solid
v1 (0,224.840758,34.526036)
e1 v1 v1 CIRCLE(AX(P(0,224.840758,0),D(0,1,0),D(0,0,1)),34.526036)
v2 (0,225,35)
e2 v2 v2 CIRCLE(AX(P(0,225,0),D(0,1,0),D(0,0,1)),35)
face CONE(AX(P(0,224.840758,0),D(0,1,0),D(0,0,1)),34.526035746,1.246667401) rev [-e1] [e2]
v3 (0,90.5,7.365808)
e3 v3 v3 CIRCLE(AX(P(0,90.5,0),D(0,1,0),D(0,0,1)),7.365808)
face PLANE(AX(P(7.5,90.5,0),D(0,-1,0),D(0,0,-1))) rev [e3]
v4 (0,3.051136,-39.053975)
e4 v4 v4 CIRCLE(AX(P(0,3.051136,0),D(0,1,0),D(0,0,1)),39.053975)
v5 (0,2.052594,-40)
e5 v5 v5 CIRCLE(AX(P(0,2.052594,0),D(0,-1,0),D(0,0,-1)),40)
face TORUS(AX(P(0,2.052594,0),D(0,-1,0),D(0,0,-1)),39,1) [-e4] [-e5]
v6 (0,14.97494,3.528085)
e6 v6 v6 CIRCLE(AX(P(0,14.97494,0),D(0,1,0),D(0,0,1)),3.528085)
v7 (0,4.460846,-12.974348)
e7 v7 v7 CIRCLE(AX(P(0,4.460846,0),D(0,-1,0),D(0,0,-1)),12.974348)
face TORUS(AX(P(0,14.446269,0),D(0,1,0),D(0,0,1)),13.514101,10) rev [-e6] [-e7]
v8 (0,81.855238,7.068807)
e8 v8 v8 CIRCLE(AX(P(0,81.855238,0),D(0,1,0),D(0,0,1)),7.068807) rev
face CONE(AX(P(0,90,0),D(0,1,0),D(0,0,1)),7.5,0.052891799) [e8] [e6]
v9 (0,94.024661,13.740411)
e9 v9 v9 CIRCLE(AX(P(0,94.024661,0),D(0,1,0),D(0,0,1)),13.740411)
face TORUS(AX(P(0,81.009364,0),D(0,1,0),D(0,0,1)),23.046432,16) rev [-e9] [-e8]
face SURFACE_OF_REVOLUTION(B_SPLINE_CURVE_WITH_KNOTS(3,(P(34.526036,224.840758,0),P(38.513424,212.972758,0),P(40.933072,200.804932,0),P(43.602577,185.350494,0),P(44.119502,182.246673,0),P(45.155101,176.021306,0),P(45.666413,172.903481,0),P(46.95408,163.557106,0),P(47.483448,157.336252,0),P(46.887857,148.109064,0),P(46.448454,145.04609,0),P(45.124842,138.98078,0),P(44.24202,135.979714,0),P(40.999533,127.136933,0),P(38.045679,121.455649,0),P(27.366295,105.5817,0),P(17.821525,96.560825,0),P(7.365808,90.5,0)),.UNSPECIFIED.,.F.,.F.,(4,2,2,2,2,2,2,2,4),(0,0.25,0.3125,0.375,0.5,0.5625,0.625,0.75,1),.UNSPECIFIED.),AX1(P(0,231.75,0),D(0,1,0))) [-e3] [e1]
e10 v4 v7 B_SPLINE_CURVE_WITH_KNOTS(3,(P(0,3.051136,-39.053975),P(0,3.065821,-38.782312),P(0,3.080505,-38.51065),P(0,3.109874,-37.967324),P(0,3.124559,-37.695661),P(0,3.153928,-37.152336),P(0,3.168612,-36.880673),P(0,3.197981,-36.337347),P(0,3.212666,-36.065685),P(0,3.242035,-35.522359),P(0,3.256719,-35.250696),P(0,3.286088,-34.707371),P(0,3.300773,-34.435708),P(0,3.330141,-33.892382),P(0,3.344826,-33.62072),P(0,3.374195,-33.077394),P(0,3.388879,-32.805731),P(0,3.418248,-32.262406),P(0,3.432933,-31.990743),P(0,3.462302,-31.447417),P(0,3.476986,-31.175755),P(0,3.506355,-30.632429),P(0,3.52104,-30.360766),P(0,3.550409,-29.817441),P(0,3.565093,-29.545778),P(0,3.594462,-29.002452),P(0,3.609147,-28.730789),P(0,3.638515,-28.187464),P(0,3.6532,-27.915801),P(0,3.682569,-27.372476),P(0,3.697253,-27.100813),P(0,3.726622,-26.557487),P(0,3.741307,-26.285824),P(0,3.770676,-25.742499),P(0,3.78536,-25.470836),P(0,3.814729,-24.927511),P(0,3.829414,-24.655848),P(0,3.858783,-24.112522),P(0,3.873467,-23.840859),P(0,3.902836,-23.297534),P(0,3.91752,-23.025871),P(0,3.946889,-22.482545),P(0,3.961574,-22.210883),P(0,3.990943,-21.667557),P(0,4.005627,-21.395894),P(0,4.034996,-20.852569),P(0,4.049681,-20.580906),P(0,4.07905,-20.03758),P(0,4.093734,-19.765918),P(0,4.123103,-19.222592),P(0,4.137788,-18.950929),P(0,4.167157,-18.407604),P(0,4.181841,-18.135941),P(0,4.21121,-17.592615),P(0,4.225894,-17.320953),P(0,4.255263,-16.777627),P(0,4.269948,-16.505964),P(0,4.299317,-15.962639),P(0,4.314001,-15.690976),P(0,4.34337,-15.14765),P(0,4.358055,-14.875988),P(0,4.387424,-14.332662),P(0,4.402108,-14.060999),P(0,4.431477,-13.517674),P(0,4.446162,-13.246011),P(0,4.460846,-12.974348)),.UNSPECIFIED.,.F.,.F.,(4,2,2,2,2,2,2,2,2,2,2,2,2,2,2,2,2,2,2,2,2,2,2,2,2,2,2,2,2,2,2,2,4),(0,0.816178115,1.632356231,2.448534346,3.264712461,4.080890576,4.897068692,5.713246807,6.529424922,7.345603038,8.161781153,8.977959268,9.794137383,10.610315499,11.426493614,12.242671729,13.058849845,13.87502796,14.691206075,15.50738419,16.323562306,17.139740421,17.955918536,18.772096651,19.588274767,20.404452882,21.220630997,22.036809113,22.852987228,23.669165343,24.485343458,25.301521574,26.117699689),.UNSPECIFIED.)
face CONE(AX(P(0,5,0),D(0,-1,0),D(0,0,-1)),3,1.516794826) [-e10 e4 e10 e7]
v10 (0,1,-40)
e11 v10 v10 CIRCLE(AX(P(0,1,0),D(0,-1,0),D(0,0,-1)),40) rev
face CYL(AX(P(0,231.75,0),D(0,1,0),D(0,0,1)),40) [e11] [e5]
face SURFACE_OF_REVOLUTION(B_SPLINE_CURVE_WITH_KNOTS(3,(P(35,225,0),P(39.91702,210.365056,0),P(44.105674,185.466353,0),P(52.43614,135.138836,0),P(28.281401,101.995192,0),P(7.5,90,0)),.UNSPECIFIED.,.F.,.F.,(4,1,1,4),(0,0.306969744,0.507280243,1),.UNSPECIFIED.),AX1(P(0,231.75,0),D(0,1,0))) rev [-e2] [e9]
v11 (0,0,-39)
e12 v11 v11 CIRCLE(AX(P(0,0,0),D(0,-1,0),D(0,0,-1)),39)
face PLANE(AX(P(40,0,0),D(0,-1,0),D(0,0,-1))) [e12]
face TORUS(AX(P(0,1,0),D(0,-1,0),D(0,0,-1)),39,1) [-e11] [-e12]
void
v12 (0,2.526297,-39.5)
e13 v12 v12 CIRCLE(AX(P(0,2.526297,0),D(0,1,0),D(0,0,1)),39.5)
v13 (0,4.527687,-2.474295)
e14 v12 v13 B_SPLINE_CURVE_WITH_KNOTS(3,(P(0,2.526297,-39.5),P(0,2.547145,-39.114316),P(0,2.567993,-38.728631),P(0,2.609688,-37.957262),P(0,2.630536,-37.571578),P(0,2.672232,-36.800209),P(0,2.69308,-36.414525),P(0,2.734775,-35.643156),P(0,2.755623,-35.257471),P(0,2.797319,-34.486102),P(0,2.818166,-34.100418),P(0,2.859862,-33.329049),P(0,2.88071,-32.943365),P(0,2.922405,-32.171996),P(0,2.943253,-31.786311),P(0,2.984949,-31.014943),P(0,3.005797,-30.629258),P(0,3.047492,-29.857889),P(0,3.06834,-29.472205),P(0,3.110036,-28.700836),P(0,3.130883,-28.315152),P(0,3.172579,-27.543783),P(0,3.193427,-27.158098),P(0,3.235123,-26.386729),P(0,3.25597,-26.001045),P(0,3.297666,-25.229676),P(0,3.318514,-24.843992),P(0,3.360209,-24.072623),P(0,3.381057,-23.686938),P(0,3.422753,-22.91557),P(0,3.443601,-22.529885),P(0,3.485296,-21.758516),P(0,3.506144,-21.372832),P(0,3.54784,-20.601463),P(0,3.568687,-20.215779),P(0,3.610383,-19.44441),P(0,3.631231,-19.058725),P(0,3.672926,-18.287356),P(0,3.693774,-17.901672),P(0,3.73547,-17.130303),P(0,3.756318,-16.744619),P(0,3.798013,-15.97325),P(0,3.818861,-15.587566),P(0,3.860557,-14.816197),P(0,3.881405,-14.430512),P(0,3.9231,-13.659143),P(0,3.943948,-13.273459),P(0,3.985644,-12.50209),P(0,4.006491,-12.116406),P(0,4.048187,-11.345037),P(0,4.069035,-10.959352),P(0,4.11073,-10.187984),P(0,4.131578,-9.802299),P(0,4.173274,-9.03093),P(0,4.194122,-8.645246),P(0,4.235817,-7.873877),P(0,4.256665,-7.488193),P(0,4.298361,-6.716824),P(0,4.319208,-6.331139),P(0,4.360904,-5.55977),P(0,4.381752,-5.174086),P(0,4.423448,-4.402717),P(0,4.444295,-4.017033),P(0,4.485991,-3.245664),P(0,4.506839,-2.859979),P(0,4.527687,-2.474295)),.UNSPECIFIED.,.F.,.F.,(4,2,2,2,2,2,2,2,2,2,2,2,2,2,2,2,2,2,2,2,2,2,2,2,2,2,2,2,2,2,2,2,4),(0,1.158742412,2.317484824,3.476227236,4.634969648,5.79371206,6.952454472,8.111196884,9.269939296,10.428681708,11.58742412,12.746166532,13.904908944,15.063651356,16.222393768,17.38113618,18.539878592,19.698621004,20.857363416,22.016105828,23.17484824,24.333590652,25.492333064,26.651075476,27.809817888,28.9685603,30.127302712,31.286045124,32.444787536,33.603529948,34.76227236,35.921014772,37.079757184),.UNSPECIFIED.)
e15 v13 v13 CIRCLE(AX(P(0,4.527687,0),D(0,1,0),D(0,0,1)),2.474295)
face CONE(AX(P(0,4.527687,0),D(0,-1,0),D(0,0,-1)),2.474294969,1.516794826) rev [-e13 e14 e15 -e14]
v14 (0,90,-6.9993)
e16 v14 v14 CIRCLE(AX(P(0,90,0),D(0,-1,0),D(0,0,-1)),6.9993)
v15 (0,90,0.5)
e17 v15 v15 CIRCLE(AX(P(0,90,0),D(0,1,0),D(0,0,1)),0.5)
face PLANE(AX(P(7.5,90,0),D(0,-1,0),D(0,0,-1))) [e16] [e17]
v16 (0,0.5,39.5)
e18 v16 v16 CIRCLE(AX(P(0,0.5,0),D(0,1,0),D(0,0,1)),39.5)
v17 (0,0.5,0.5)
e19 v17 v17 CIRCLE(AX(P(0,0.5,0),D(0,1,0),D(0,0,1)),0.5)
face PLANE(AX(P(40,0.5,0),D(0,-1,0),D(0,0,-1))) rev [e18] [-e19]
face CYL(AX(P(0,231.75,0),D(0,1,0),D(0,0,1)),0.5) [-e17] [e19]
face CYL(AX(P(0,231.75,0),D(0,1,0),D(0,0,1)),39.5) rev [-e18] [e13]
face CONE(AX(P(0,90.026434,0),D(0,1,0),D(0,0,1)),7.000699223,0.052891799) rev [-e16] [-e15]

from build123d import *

# Parameters (mm, degrees)
REVOLVE_THIN1_OUTLINE_W   = 7.365807556
REVOLVE_THIN1_OUTLINE_H   = 0.5
REVOLVE_THIN1_OUTLINE_W_2 = 0.134192444
FILLET1_R                 = 10
FILLET2_R                 = 16
FILLET3_R                 = 1


# Read off the part's stored shape, not the designer's step: Revolve-Thin1
with BuildPart() as part:
    # Revolve-Thin1 outline → Revolve-Thin1 (revolve)
    with BuildSketch(Plane.XY):
        with Locations((3.682903778, 90.25)):
            Rectangle(REVOLVE_THIN1_OUTLINE_W, REVOLVE_THIN1_OUTLINE_H)
        with BuildLine():
            add(Edge.make_bspline(
                [(7.5, 90.577978433), (7.455285949, 90.551931479), (7.410555095, 90.525938631), (7.365807556, 90.5)],
                knots=[0.99893007, 0.99893007, 0.99893007, 0.99893007, 1, 1, 1, 1], degree=3))
            Line((7.365807556, 90.5), (7.5, 90.5))
            Line((7.5, 90.5), (7.5, 90.577978433))
        make_face()
        with Locations((7.432903778, 90.25)):
            Rectangle(REVOLVE_THIN1_OUTLINE_W_2, REVOLVE_THIN1_OUTLINE_H)
        with BuildLine():
            add(Edge.make_bspline(
                [(34.526035746, 116.224068176), (34.512660612, 116.204150697), (34.499276892, 116.184238728), (27.396765127, 105.626990517), (17.903178429, 96.638067113), (7.5, 90.577978433)],
                knots=[0.749529738, 0.749529738, 0.749529738, 0.749529738, 0.75, 0.75, 0.99893007, 0.99893007, 0.99893007, 0.99893007], degree=3))
            Line((7.5, 90.577978433), (7.5, 90.5))
            Line((7.5, 90.5), (8.352912818, 90.5))
            add(Edge.make_bspline(
                [(34.526035746, 115.332949182), (27.575400822, 105.173919249), (18.409466047, 96.486433496), (8.352912818, 90.5)],
                knots=[0.753639532, 0.753639532, 0.753639532, 0.753639532, 0.993242921, 0.993242921, 0.993242921, 0.993242921], degree=3))
            Line((34.526035746, 115.332949182), (34.526035746, 116.224068176))
        make_face()
        with BuildLine():
            Line((8.352912818, 90.5), (7.5, 90.5))
            Line((7.5, 90.5), (7.5, 90))
            add(Edge.make_bspline(
                [(8.352912818, 90.5), (8.069306953, 90.331175989), (7.784992776, 90.16450013), (7.5, 90)],
                knots=[0.993242921, 0.993242921, 0.993242921, 0.993242921, 1, 1, 1, 1], degree=3))
        make_face()
        with BuildLine():
            add(Edge.make_bspline(
                [(35, 116.937654659), (34.843239639, 116.699022317), (34.685245979, 116.461154885), (34.526035746, 116.224068176)],
                knots=[0.743931995, 0.743931995, 0.743931995, 0.743931995, 0.749529738, 0.749529738, 0.749529738, 0.749529738], degree=3))
            Line((34.526035746, 116.224068176), (34.526035746, 115.332949182))
            add(Edge.make_bspline(
                [(35, 116.033110225), (34.843184029, 115.798961501), (34.685190644, 115.565569566), (34.526035746, 115.332949182)],
                knots=[0.748153119, 0.748153119, 0.748153119, 0.748153119, 0.753639532, 0.753639532, 0.753639532, 0.753639532], degree=3))
            Line((35, 116.033110225), (35, 116.937654659))
        make_face()
        with BuildLine():
            add(Edge.make_bspline(
                [(35, 223.406176232), (38.707754789, 211.992882418), (41.019034398, 200.307274966), (43.602577081, 185.350494264), (44.119501526, 182.246673107), (45.155101131, 176.021305771), (45.666413266, 172.90348054), (46.954080187, 163.557105891), (47.483447687, 157.336251858), (46.887857201, 148.10906378), (46.448454036, 145.046089868), (45.124841561, 138.98077957), (44.242019923, 135.979713916), (41.104468819, 127.423109067), (38.330596439, 122.007737575), (35, 116.937654659)],
                knots=[0.010062995, 0.010062995, 0.010062995, 0.010062995, 0.25, 0.25, 0.3125, 0.3125, 0.375, 0.375, 0.5, 0.5, 0.5625, 0.5625, 0.625, 0.625, 0.743931995, 0.743931995, 0.743931995, 0.743931995], degree=3))
            Line((35, 116.937654659), (35, 116.033110225))
            add(Edge.make_bspline(
                [(47.720690898, 155.470930616), (47.720690908, 153.64342431), (47.202796274, 139.839119264), (41.88477425, 126.313065149), (35, 116.033110225)],
                knots=[0.470604098, 0.470604098, 0.470604098, 0.470604098, 0.507280243, 0.748153119, 0.748153119, 0.748153119, 0.748153119], degree=3))
            add(Edge.make_bspline(
                [(35.053402076, 224.840758405), (39.935404776, 210.255770266), (43.812104415, 187.210591853), (47.720690851, 163.624535934), (47.720690898, 155.470930616)],
                knots=[0.001113252, 0.001113252, 0.001113252, 0.001113252, 0.306969744, 0.470604098, 0.470604098, 0.470604098, 0.470604098], degree=3))
            Line((35.053402076, 224.840758405), (35, 224.840758405))
            Line((35, 224.840758405), (35, 223.406176232))
        make_face()
        with BuildLine():
            Line((35, 224.840758405), (34.526035746, 224.840758405))
            add(Edge.make_bspline(
                [(34.526035746, 224.840758405), (34.68653601, 224.363047867), (34.844496189, 223.884851546), (35, 223.406176232)],
                knots=[0, 0, 0, 0, 0.010062995, 0.010062995, 0.010062995, 0.010062995], degree=3))
            Line((35, 223.406176232), (35, 224.840758405))
        make_face()
        Polygon((35, 225), (34.526035746, 224.840758405), (35, 224.840758405), align=None)
        with BuildLine():
            add(Edge.make_bspline(
                [(35, 225), (35.017831987, 224.946925146), (35.035632641, 224.893844612), (35.053402076, 224.840758405)],
                knots=[0, 0, 0, 0, 0.001113252, 0.001113252, 0.001113252, 0.001113252], degree=3))
            Line((35, 225), (35, 224.840758405))
            Line((35, 224.840758405), (35.053402076, 224.840758405))
        make_face()
    revolve(axis=Axis((0, 0, 0), (0, 1, 0)))

    # Sketch2 → Revolve-Thin9 (revolve)
    with BuildSketch(Plane.XY, mode=Mode.PRIVATE) as revolve_thin9_sk:
        Polygon((7.5, 90), (3, 5), (40, 3), (40, 0), (0, 0), (0, 90), (0.5, 90), (0.5, 0.5), (39.5, 0.5), (39.5, 2.5262971), (2.474294969, 4.527686561), (7.000699223, 90.026433571), align=None)
    revolve(revolve_thin9_sk.sketch.rotate(Axis((0, 231.75, 0), (0, -1, 0)), 90), axis=Axis((0, 231.75, 0), (0, -1, 0)))

    # Fillet1
    fillet1_edges = [part.edges().sort_by_distance(p)[0] for p in [
        (0, 5, -3),
    ]]
    fillet(fillet1_edges, radius=FILLET1_R)

    # Fillet2
    fillet2_edges = [part.edges().sort_by_distance(p)[0] for p in [
        (-5.303300859, 90, -5.303300859),
    ]]
    fillet(fillet2_edges, radius=FILLET2_R)

    # Fillet3
    fillet3_edges = [part.edges().sort_by_distance(p)[0] for p in [
        (0, 3, -40),
        (0, 0, -40),
    ]]
    fillet(fillet3_edges, radius=FILLET3_R)


solid = part.part
